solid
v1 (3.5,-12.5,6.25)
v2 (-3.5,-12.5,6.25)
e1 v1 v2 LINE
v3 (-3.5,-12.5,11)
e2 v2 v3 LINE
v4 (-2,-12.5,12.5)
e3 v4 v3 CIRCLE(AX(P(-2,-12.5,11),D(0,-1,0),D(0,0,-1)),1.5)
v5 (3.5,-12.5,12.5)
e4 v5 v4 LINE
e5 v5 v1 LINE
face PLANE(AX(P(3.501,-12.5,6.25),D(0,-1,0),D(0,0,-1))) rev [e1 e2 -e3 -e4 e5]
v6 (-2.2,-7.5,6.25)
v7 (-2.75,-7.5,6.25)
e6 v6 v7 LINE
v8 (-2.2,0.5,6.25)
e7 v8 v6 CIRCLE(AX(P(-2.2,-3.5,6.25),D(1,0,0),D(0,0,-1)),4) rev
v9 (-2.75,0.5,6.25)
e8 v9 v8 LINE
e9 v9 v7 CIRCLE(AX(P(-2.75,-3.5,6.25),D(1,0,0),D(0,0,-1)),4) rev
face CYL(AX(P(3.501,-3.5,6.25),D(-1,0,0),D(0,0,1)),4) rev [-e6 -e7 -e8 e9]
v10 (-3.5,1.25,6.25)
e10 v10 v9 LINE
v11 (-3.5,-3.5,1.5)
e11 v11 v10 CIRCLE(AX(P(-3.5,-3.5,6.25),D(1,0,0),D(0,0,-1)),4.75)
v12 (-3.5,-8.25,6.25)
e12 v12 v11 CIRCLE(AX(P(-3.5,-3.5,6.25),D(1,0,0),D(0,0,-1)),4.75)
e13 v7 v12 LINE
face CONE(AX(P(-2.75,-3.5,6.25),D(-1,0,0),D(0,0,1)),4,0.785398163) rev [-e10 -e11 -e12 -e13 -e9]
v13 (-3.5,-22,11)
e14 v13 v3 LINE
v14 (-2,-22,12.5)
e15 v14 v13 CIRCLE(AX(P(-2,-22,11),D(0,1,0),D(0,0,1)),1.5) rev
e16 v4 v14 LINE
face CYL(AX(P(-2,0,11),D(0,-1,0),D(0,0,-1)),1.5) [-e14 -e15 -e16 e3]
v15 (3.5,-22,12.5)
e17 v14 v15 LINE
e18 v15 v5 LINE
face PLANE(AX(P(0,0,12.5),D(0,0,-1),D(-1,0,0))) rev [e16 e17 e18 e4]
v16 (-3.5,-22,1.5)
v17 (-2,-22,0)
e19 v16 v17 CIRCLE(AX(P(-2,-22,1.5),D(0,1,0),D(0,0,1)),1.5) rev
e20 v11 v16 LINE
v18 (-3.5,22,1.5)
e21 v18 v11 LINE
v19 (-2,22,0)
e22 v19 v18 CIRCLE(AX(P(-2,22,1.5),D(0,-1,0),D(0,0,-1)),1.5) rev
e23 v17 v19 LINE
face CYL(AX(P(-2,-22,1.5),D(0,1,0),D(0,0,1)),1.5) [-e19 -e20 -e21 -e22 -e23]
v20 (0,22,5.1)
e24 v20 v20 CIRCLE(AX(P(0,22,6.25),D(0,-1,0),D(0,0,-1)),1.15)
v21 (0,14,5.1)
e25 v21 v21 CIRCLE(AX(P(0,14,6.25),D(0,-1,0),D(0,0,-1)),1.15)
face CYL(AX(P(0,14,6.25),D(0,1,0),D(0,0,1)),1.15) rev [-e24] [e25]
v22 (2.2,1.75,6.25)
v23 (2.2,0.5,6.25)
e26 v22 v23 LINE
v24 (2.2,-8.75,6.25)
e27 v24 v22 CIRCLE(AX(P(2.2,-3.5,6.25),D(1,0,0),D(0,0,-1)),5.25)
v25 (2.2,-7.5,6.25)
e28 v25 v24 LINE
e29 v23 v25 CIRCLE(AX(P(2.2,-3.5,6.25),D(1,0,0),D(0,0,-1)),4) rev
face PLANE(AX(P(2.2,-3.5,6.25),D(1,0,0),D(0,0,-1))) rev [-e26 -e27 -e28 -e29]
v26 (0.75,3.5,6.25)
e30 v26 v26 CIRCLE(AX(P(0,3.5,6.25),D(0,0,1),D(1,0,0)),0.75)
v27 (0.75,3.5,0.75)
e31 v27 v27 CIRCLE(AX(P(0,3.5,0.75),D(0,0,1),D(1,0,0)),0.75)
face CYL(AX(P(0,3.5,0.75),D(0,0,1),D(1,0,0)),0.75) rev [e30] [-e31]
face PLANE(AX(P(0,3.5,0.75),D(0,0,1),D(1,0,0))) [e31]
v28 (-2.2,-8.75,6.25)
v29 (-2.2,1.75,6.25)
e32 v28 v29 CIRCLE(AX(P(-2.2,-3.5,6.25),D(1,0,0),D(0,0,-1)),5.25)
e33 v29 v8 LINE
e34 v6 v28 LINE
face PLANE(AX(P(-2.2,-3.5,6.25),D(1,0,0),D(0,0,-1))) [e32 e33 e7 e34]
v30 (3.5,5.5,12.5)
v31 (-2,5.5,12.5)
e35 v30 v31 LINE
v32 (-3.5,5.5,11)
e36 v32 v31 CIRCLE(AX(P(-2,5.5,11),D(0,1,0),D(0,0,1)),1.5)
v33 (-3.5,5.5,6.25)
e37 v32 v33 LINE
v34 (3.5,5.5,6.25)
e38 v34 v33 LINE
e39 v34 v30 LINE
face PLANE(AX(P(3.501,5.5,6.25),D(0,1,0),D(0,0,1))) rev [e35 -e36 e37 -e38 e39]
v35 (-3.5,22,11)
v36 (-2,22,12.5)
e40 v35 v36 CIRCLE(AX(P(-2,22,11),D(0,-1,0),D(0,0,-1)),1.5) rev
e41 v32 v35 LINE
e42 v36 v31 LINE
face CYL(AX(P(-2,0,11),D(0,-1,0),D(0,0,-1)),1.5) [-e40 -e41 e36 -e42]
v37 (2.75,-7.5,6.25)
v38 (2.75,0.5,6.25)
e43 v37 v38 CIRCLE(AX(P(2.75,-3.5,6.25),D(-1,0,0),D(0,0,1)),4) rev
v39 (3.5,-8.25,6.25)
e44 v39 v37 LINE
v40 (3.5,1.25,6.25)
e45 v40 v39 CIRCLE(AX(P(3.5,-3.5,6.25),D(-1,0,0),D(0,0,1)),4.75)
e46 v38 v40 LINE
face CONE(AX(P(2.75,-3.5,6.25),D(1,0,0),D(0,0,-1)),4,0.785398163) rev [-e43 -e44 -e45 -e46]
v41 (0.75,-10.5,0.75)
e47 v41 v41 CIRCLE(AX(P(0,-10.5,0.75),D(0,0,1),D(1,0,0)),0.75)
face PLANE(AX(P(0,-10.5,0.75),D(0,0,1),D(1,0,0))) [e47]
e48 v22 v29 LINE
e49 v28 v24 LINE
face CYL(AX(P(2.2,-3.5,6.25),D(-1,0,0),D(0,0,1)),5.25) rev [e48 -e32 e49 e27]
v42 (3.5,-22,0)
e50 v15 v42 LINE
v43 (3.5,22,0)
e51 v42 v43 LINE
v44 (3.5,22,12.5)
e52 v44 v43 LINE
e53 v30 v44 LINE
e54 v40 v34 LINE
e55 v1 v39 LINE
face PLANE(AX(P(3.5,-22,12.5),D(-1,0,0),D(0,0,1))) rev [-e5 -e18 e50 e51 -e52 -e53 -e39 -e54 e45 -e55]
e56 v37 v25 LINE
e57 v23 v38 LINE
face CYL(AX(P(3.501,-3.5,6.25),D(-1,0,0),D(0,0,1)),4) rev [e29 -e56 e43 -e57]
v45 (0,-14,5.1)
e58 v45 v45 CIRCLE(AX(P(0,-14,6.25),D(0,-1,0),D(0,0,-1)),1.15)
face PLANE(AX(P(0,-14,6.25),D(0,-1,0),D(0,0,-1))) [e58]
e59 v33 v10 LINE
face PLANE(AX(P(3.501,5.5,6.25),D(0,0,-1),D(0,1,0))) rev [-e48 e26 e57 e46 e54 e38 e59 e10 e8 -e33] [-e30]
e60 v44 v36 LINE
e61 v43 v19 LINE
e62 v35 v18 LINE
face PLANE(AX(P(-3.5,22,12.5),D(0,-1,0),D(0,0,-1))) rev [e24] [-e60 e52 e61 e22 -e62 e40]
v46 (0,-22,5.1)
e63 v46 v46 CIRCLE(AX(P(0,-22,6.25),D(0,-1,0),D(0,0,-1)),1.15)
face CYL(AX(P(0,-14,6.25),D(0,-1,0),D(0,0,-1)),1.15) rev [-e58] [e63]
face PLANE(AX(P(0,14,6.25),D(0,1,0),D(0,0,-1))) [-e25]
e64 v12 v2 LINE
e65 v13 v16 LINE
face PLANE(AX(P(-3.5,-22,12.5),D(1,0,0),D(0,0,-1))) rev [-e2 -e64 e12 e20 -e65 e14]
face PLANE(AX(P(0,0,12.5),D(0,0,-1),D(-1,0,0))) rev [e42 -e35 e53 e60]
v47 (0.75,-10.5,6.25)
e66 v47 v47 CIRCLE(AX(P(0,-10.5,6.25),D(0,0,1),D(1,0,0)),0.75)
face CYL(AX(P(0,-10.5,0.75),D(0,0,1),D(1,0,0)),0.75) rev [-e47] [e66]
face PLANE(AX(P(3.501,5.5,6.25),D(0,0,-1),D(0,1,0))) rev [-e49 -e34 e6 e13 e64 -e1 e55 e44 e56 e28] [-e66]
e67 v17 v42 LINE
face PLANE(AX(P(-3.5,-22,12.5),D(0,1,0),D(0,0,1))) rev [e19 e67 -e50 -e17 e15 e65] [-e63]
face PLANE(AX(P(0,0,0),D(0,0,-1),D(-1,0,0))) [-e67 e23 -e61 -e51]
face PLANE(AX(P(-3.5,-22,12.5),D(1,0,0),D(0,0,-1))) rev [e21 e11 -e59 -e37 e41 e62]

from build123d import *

# Parameters (mm, degrees)
SKETCH_1_W                  = 7
SKETCH_1_H                  = 44
EXTRUDE_485_DEPTH           = 12.5
FILLET_3_R                  = 1.5
CUT_EXTRUDE_1218_REACH      = 28.254
SKETCH_6_R                  = 4
CUT_EXTRUDE_1261_REACH      = 28.254
SKETCH_7_W                  = 6.25
SKETCH_7_H                  = 18
SKETCH_11_R                 = 1.15
CUT_EXTRUDE_1309_DEPTH      = 8
CUT_EXTRUDE_1453_DEPTH      = 2.2
CUT_EXTRUDE_1453_DEPTH_BACK = 2.2
SKETCH_12_R                 = 5.25
SKETCH_13_R                 = 0.75
CUT_EXTRUDE_1751_DEPTH      = 5.5
CHAMFER_1_SIZE              = 0.75


with BuildPart() as part:
    # Эскиз1 → Extrude 485 (new body)
    with BuildSketch(Plane.XY):
        Rectangle(SKETCH_1_W, SKETCH_1_H)
    extrude(amount=EXTRUDE_485_DEPTH)

    # Скругление3
    fillet_3_edges = [part.edges().sort_by_distance(p)[0] for p in [
        (-3.5, 0, 12.5),
        (-3.5, 0, 0),
    ]]
    fillet(fillet_3_edges, radius=FILLET_3_R)

    # Эскиз6 → Cut-Extrude 1218 (cut, up to next)
    with BuildSketch(Plane.ZY.offset(3.5), mode=Mode.PRIVATE) as cut_extrude_1218_sk1:
        with Locations((6.25, -3.5)):
            Circle(SKETCH_6_R)
    cut_extrude_1218_tool1 = extrude(cut_extrude_1218_sk1.sketch, amount=-CUT_EXTRUDE_1218_REACH, mode=Mode.PRIVATE) & part.part
    add(cut_extrude_1218_tool1.solids().sort_by_distance((-3.5, -3.5, 6.25))[0], mode=Mode.SUBTRACT)

    # Эскиз7 → Cut-Extrude 1261 (cut, up to next)
    with BuildSketch(Plane.ZY.offset(3.5), mode=Mode.PRIVATE) as cut_extrude_1261_sk1:
        with Locations((9.375, -3.5)):
            Rectangle(SKETCH_7_W, SKETCH_7_H)
    cut_extrude_1261_tool1 = extrude(cut_extrude_1261_sk1.sketch, amount=-CUT_EXTRUDE_1261_REACH, mode=Mode.PRIVATE) & part.part
    add(cut_extrude_1261_tool1.solids().sort_by_distance((-3.5, -3.5, 9.375))[0], mode=Mode.SUBTRACT)

    # Эскиз11 → Cut-Extrude 1309 (cut)
    with BuildSketch(Plane.XZ.offset(22)):
        with Locations(Location((0, 6.25, 0), (0, 0, 270))):
            Circle(SKETCH_11_R)
    cut_extrude_1309 = extrude(amount=-CUT_EXTRUDE_1309_DEPTH, mode=Mode.SUBTRACT)

    # Mirror 1353: Cut-Extrude 1309 across plane
    add(cut_extrude_1309.mirror(Plane.ZX), mode=Mode.SUBTRACT)

    # Эскиз12 → Cut-Extrude 1453 (cut, two sides: drawn at the far end of the back side and taken through both)
    with BuildSketch(Plane(origin=(0, 0, 0), x_dir=(0, 0, -1), z_dir=(1, 0, 0)).offset(-CUT_EXTRUDE_1453_DEPTH_BACK)):
        with Locations((-6.25, -3.5)):
            Circle(SKETCH_12_R)
    extrude(amount=CUT_EXTRUDE_1453_DEPTH + CUT_EXTRUDE_1453_DEPTH_BACK, mode=Mode.SUBTRACT)

    # Эскиз13 → Cut-Extrude 1751 (cut)
    with BuildSketch(Plane.XY.offset(6.25)):
        with Locations((0, 3.5)):
            Circle(SKETCH_13_R)
        with Locations((0, -10.5)):
            Circle(SKETCH_13_R)
    extrude(amount=-CUT_EXTRUDE_1751_DEPTH, mode=Mode.SUBTRACT)

    # Фаска1
    chamfer_1_edges = [part.edges().sort_by_distance(p)[0] for p in [
        (-3.5, -3.5, 2.25),
        (3.5, -3.5, 2.25),
    ]]
    chamfer(chamfer_1_edges, length=CHAMFER_1_SIZE - 0.0001)  # a hair under: the kernel refuses the full size


solid = part.part
